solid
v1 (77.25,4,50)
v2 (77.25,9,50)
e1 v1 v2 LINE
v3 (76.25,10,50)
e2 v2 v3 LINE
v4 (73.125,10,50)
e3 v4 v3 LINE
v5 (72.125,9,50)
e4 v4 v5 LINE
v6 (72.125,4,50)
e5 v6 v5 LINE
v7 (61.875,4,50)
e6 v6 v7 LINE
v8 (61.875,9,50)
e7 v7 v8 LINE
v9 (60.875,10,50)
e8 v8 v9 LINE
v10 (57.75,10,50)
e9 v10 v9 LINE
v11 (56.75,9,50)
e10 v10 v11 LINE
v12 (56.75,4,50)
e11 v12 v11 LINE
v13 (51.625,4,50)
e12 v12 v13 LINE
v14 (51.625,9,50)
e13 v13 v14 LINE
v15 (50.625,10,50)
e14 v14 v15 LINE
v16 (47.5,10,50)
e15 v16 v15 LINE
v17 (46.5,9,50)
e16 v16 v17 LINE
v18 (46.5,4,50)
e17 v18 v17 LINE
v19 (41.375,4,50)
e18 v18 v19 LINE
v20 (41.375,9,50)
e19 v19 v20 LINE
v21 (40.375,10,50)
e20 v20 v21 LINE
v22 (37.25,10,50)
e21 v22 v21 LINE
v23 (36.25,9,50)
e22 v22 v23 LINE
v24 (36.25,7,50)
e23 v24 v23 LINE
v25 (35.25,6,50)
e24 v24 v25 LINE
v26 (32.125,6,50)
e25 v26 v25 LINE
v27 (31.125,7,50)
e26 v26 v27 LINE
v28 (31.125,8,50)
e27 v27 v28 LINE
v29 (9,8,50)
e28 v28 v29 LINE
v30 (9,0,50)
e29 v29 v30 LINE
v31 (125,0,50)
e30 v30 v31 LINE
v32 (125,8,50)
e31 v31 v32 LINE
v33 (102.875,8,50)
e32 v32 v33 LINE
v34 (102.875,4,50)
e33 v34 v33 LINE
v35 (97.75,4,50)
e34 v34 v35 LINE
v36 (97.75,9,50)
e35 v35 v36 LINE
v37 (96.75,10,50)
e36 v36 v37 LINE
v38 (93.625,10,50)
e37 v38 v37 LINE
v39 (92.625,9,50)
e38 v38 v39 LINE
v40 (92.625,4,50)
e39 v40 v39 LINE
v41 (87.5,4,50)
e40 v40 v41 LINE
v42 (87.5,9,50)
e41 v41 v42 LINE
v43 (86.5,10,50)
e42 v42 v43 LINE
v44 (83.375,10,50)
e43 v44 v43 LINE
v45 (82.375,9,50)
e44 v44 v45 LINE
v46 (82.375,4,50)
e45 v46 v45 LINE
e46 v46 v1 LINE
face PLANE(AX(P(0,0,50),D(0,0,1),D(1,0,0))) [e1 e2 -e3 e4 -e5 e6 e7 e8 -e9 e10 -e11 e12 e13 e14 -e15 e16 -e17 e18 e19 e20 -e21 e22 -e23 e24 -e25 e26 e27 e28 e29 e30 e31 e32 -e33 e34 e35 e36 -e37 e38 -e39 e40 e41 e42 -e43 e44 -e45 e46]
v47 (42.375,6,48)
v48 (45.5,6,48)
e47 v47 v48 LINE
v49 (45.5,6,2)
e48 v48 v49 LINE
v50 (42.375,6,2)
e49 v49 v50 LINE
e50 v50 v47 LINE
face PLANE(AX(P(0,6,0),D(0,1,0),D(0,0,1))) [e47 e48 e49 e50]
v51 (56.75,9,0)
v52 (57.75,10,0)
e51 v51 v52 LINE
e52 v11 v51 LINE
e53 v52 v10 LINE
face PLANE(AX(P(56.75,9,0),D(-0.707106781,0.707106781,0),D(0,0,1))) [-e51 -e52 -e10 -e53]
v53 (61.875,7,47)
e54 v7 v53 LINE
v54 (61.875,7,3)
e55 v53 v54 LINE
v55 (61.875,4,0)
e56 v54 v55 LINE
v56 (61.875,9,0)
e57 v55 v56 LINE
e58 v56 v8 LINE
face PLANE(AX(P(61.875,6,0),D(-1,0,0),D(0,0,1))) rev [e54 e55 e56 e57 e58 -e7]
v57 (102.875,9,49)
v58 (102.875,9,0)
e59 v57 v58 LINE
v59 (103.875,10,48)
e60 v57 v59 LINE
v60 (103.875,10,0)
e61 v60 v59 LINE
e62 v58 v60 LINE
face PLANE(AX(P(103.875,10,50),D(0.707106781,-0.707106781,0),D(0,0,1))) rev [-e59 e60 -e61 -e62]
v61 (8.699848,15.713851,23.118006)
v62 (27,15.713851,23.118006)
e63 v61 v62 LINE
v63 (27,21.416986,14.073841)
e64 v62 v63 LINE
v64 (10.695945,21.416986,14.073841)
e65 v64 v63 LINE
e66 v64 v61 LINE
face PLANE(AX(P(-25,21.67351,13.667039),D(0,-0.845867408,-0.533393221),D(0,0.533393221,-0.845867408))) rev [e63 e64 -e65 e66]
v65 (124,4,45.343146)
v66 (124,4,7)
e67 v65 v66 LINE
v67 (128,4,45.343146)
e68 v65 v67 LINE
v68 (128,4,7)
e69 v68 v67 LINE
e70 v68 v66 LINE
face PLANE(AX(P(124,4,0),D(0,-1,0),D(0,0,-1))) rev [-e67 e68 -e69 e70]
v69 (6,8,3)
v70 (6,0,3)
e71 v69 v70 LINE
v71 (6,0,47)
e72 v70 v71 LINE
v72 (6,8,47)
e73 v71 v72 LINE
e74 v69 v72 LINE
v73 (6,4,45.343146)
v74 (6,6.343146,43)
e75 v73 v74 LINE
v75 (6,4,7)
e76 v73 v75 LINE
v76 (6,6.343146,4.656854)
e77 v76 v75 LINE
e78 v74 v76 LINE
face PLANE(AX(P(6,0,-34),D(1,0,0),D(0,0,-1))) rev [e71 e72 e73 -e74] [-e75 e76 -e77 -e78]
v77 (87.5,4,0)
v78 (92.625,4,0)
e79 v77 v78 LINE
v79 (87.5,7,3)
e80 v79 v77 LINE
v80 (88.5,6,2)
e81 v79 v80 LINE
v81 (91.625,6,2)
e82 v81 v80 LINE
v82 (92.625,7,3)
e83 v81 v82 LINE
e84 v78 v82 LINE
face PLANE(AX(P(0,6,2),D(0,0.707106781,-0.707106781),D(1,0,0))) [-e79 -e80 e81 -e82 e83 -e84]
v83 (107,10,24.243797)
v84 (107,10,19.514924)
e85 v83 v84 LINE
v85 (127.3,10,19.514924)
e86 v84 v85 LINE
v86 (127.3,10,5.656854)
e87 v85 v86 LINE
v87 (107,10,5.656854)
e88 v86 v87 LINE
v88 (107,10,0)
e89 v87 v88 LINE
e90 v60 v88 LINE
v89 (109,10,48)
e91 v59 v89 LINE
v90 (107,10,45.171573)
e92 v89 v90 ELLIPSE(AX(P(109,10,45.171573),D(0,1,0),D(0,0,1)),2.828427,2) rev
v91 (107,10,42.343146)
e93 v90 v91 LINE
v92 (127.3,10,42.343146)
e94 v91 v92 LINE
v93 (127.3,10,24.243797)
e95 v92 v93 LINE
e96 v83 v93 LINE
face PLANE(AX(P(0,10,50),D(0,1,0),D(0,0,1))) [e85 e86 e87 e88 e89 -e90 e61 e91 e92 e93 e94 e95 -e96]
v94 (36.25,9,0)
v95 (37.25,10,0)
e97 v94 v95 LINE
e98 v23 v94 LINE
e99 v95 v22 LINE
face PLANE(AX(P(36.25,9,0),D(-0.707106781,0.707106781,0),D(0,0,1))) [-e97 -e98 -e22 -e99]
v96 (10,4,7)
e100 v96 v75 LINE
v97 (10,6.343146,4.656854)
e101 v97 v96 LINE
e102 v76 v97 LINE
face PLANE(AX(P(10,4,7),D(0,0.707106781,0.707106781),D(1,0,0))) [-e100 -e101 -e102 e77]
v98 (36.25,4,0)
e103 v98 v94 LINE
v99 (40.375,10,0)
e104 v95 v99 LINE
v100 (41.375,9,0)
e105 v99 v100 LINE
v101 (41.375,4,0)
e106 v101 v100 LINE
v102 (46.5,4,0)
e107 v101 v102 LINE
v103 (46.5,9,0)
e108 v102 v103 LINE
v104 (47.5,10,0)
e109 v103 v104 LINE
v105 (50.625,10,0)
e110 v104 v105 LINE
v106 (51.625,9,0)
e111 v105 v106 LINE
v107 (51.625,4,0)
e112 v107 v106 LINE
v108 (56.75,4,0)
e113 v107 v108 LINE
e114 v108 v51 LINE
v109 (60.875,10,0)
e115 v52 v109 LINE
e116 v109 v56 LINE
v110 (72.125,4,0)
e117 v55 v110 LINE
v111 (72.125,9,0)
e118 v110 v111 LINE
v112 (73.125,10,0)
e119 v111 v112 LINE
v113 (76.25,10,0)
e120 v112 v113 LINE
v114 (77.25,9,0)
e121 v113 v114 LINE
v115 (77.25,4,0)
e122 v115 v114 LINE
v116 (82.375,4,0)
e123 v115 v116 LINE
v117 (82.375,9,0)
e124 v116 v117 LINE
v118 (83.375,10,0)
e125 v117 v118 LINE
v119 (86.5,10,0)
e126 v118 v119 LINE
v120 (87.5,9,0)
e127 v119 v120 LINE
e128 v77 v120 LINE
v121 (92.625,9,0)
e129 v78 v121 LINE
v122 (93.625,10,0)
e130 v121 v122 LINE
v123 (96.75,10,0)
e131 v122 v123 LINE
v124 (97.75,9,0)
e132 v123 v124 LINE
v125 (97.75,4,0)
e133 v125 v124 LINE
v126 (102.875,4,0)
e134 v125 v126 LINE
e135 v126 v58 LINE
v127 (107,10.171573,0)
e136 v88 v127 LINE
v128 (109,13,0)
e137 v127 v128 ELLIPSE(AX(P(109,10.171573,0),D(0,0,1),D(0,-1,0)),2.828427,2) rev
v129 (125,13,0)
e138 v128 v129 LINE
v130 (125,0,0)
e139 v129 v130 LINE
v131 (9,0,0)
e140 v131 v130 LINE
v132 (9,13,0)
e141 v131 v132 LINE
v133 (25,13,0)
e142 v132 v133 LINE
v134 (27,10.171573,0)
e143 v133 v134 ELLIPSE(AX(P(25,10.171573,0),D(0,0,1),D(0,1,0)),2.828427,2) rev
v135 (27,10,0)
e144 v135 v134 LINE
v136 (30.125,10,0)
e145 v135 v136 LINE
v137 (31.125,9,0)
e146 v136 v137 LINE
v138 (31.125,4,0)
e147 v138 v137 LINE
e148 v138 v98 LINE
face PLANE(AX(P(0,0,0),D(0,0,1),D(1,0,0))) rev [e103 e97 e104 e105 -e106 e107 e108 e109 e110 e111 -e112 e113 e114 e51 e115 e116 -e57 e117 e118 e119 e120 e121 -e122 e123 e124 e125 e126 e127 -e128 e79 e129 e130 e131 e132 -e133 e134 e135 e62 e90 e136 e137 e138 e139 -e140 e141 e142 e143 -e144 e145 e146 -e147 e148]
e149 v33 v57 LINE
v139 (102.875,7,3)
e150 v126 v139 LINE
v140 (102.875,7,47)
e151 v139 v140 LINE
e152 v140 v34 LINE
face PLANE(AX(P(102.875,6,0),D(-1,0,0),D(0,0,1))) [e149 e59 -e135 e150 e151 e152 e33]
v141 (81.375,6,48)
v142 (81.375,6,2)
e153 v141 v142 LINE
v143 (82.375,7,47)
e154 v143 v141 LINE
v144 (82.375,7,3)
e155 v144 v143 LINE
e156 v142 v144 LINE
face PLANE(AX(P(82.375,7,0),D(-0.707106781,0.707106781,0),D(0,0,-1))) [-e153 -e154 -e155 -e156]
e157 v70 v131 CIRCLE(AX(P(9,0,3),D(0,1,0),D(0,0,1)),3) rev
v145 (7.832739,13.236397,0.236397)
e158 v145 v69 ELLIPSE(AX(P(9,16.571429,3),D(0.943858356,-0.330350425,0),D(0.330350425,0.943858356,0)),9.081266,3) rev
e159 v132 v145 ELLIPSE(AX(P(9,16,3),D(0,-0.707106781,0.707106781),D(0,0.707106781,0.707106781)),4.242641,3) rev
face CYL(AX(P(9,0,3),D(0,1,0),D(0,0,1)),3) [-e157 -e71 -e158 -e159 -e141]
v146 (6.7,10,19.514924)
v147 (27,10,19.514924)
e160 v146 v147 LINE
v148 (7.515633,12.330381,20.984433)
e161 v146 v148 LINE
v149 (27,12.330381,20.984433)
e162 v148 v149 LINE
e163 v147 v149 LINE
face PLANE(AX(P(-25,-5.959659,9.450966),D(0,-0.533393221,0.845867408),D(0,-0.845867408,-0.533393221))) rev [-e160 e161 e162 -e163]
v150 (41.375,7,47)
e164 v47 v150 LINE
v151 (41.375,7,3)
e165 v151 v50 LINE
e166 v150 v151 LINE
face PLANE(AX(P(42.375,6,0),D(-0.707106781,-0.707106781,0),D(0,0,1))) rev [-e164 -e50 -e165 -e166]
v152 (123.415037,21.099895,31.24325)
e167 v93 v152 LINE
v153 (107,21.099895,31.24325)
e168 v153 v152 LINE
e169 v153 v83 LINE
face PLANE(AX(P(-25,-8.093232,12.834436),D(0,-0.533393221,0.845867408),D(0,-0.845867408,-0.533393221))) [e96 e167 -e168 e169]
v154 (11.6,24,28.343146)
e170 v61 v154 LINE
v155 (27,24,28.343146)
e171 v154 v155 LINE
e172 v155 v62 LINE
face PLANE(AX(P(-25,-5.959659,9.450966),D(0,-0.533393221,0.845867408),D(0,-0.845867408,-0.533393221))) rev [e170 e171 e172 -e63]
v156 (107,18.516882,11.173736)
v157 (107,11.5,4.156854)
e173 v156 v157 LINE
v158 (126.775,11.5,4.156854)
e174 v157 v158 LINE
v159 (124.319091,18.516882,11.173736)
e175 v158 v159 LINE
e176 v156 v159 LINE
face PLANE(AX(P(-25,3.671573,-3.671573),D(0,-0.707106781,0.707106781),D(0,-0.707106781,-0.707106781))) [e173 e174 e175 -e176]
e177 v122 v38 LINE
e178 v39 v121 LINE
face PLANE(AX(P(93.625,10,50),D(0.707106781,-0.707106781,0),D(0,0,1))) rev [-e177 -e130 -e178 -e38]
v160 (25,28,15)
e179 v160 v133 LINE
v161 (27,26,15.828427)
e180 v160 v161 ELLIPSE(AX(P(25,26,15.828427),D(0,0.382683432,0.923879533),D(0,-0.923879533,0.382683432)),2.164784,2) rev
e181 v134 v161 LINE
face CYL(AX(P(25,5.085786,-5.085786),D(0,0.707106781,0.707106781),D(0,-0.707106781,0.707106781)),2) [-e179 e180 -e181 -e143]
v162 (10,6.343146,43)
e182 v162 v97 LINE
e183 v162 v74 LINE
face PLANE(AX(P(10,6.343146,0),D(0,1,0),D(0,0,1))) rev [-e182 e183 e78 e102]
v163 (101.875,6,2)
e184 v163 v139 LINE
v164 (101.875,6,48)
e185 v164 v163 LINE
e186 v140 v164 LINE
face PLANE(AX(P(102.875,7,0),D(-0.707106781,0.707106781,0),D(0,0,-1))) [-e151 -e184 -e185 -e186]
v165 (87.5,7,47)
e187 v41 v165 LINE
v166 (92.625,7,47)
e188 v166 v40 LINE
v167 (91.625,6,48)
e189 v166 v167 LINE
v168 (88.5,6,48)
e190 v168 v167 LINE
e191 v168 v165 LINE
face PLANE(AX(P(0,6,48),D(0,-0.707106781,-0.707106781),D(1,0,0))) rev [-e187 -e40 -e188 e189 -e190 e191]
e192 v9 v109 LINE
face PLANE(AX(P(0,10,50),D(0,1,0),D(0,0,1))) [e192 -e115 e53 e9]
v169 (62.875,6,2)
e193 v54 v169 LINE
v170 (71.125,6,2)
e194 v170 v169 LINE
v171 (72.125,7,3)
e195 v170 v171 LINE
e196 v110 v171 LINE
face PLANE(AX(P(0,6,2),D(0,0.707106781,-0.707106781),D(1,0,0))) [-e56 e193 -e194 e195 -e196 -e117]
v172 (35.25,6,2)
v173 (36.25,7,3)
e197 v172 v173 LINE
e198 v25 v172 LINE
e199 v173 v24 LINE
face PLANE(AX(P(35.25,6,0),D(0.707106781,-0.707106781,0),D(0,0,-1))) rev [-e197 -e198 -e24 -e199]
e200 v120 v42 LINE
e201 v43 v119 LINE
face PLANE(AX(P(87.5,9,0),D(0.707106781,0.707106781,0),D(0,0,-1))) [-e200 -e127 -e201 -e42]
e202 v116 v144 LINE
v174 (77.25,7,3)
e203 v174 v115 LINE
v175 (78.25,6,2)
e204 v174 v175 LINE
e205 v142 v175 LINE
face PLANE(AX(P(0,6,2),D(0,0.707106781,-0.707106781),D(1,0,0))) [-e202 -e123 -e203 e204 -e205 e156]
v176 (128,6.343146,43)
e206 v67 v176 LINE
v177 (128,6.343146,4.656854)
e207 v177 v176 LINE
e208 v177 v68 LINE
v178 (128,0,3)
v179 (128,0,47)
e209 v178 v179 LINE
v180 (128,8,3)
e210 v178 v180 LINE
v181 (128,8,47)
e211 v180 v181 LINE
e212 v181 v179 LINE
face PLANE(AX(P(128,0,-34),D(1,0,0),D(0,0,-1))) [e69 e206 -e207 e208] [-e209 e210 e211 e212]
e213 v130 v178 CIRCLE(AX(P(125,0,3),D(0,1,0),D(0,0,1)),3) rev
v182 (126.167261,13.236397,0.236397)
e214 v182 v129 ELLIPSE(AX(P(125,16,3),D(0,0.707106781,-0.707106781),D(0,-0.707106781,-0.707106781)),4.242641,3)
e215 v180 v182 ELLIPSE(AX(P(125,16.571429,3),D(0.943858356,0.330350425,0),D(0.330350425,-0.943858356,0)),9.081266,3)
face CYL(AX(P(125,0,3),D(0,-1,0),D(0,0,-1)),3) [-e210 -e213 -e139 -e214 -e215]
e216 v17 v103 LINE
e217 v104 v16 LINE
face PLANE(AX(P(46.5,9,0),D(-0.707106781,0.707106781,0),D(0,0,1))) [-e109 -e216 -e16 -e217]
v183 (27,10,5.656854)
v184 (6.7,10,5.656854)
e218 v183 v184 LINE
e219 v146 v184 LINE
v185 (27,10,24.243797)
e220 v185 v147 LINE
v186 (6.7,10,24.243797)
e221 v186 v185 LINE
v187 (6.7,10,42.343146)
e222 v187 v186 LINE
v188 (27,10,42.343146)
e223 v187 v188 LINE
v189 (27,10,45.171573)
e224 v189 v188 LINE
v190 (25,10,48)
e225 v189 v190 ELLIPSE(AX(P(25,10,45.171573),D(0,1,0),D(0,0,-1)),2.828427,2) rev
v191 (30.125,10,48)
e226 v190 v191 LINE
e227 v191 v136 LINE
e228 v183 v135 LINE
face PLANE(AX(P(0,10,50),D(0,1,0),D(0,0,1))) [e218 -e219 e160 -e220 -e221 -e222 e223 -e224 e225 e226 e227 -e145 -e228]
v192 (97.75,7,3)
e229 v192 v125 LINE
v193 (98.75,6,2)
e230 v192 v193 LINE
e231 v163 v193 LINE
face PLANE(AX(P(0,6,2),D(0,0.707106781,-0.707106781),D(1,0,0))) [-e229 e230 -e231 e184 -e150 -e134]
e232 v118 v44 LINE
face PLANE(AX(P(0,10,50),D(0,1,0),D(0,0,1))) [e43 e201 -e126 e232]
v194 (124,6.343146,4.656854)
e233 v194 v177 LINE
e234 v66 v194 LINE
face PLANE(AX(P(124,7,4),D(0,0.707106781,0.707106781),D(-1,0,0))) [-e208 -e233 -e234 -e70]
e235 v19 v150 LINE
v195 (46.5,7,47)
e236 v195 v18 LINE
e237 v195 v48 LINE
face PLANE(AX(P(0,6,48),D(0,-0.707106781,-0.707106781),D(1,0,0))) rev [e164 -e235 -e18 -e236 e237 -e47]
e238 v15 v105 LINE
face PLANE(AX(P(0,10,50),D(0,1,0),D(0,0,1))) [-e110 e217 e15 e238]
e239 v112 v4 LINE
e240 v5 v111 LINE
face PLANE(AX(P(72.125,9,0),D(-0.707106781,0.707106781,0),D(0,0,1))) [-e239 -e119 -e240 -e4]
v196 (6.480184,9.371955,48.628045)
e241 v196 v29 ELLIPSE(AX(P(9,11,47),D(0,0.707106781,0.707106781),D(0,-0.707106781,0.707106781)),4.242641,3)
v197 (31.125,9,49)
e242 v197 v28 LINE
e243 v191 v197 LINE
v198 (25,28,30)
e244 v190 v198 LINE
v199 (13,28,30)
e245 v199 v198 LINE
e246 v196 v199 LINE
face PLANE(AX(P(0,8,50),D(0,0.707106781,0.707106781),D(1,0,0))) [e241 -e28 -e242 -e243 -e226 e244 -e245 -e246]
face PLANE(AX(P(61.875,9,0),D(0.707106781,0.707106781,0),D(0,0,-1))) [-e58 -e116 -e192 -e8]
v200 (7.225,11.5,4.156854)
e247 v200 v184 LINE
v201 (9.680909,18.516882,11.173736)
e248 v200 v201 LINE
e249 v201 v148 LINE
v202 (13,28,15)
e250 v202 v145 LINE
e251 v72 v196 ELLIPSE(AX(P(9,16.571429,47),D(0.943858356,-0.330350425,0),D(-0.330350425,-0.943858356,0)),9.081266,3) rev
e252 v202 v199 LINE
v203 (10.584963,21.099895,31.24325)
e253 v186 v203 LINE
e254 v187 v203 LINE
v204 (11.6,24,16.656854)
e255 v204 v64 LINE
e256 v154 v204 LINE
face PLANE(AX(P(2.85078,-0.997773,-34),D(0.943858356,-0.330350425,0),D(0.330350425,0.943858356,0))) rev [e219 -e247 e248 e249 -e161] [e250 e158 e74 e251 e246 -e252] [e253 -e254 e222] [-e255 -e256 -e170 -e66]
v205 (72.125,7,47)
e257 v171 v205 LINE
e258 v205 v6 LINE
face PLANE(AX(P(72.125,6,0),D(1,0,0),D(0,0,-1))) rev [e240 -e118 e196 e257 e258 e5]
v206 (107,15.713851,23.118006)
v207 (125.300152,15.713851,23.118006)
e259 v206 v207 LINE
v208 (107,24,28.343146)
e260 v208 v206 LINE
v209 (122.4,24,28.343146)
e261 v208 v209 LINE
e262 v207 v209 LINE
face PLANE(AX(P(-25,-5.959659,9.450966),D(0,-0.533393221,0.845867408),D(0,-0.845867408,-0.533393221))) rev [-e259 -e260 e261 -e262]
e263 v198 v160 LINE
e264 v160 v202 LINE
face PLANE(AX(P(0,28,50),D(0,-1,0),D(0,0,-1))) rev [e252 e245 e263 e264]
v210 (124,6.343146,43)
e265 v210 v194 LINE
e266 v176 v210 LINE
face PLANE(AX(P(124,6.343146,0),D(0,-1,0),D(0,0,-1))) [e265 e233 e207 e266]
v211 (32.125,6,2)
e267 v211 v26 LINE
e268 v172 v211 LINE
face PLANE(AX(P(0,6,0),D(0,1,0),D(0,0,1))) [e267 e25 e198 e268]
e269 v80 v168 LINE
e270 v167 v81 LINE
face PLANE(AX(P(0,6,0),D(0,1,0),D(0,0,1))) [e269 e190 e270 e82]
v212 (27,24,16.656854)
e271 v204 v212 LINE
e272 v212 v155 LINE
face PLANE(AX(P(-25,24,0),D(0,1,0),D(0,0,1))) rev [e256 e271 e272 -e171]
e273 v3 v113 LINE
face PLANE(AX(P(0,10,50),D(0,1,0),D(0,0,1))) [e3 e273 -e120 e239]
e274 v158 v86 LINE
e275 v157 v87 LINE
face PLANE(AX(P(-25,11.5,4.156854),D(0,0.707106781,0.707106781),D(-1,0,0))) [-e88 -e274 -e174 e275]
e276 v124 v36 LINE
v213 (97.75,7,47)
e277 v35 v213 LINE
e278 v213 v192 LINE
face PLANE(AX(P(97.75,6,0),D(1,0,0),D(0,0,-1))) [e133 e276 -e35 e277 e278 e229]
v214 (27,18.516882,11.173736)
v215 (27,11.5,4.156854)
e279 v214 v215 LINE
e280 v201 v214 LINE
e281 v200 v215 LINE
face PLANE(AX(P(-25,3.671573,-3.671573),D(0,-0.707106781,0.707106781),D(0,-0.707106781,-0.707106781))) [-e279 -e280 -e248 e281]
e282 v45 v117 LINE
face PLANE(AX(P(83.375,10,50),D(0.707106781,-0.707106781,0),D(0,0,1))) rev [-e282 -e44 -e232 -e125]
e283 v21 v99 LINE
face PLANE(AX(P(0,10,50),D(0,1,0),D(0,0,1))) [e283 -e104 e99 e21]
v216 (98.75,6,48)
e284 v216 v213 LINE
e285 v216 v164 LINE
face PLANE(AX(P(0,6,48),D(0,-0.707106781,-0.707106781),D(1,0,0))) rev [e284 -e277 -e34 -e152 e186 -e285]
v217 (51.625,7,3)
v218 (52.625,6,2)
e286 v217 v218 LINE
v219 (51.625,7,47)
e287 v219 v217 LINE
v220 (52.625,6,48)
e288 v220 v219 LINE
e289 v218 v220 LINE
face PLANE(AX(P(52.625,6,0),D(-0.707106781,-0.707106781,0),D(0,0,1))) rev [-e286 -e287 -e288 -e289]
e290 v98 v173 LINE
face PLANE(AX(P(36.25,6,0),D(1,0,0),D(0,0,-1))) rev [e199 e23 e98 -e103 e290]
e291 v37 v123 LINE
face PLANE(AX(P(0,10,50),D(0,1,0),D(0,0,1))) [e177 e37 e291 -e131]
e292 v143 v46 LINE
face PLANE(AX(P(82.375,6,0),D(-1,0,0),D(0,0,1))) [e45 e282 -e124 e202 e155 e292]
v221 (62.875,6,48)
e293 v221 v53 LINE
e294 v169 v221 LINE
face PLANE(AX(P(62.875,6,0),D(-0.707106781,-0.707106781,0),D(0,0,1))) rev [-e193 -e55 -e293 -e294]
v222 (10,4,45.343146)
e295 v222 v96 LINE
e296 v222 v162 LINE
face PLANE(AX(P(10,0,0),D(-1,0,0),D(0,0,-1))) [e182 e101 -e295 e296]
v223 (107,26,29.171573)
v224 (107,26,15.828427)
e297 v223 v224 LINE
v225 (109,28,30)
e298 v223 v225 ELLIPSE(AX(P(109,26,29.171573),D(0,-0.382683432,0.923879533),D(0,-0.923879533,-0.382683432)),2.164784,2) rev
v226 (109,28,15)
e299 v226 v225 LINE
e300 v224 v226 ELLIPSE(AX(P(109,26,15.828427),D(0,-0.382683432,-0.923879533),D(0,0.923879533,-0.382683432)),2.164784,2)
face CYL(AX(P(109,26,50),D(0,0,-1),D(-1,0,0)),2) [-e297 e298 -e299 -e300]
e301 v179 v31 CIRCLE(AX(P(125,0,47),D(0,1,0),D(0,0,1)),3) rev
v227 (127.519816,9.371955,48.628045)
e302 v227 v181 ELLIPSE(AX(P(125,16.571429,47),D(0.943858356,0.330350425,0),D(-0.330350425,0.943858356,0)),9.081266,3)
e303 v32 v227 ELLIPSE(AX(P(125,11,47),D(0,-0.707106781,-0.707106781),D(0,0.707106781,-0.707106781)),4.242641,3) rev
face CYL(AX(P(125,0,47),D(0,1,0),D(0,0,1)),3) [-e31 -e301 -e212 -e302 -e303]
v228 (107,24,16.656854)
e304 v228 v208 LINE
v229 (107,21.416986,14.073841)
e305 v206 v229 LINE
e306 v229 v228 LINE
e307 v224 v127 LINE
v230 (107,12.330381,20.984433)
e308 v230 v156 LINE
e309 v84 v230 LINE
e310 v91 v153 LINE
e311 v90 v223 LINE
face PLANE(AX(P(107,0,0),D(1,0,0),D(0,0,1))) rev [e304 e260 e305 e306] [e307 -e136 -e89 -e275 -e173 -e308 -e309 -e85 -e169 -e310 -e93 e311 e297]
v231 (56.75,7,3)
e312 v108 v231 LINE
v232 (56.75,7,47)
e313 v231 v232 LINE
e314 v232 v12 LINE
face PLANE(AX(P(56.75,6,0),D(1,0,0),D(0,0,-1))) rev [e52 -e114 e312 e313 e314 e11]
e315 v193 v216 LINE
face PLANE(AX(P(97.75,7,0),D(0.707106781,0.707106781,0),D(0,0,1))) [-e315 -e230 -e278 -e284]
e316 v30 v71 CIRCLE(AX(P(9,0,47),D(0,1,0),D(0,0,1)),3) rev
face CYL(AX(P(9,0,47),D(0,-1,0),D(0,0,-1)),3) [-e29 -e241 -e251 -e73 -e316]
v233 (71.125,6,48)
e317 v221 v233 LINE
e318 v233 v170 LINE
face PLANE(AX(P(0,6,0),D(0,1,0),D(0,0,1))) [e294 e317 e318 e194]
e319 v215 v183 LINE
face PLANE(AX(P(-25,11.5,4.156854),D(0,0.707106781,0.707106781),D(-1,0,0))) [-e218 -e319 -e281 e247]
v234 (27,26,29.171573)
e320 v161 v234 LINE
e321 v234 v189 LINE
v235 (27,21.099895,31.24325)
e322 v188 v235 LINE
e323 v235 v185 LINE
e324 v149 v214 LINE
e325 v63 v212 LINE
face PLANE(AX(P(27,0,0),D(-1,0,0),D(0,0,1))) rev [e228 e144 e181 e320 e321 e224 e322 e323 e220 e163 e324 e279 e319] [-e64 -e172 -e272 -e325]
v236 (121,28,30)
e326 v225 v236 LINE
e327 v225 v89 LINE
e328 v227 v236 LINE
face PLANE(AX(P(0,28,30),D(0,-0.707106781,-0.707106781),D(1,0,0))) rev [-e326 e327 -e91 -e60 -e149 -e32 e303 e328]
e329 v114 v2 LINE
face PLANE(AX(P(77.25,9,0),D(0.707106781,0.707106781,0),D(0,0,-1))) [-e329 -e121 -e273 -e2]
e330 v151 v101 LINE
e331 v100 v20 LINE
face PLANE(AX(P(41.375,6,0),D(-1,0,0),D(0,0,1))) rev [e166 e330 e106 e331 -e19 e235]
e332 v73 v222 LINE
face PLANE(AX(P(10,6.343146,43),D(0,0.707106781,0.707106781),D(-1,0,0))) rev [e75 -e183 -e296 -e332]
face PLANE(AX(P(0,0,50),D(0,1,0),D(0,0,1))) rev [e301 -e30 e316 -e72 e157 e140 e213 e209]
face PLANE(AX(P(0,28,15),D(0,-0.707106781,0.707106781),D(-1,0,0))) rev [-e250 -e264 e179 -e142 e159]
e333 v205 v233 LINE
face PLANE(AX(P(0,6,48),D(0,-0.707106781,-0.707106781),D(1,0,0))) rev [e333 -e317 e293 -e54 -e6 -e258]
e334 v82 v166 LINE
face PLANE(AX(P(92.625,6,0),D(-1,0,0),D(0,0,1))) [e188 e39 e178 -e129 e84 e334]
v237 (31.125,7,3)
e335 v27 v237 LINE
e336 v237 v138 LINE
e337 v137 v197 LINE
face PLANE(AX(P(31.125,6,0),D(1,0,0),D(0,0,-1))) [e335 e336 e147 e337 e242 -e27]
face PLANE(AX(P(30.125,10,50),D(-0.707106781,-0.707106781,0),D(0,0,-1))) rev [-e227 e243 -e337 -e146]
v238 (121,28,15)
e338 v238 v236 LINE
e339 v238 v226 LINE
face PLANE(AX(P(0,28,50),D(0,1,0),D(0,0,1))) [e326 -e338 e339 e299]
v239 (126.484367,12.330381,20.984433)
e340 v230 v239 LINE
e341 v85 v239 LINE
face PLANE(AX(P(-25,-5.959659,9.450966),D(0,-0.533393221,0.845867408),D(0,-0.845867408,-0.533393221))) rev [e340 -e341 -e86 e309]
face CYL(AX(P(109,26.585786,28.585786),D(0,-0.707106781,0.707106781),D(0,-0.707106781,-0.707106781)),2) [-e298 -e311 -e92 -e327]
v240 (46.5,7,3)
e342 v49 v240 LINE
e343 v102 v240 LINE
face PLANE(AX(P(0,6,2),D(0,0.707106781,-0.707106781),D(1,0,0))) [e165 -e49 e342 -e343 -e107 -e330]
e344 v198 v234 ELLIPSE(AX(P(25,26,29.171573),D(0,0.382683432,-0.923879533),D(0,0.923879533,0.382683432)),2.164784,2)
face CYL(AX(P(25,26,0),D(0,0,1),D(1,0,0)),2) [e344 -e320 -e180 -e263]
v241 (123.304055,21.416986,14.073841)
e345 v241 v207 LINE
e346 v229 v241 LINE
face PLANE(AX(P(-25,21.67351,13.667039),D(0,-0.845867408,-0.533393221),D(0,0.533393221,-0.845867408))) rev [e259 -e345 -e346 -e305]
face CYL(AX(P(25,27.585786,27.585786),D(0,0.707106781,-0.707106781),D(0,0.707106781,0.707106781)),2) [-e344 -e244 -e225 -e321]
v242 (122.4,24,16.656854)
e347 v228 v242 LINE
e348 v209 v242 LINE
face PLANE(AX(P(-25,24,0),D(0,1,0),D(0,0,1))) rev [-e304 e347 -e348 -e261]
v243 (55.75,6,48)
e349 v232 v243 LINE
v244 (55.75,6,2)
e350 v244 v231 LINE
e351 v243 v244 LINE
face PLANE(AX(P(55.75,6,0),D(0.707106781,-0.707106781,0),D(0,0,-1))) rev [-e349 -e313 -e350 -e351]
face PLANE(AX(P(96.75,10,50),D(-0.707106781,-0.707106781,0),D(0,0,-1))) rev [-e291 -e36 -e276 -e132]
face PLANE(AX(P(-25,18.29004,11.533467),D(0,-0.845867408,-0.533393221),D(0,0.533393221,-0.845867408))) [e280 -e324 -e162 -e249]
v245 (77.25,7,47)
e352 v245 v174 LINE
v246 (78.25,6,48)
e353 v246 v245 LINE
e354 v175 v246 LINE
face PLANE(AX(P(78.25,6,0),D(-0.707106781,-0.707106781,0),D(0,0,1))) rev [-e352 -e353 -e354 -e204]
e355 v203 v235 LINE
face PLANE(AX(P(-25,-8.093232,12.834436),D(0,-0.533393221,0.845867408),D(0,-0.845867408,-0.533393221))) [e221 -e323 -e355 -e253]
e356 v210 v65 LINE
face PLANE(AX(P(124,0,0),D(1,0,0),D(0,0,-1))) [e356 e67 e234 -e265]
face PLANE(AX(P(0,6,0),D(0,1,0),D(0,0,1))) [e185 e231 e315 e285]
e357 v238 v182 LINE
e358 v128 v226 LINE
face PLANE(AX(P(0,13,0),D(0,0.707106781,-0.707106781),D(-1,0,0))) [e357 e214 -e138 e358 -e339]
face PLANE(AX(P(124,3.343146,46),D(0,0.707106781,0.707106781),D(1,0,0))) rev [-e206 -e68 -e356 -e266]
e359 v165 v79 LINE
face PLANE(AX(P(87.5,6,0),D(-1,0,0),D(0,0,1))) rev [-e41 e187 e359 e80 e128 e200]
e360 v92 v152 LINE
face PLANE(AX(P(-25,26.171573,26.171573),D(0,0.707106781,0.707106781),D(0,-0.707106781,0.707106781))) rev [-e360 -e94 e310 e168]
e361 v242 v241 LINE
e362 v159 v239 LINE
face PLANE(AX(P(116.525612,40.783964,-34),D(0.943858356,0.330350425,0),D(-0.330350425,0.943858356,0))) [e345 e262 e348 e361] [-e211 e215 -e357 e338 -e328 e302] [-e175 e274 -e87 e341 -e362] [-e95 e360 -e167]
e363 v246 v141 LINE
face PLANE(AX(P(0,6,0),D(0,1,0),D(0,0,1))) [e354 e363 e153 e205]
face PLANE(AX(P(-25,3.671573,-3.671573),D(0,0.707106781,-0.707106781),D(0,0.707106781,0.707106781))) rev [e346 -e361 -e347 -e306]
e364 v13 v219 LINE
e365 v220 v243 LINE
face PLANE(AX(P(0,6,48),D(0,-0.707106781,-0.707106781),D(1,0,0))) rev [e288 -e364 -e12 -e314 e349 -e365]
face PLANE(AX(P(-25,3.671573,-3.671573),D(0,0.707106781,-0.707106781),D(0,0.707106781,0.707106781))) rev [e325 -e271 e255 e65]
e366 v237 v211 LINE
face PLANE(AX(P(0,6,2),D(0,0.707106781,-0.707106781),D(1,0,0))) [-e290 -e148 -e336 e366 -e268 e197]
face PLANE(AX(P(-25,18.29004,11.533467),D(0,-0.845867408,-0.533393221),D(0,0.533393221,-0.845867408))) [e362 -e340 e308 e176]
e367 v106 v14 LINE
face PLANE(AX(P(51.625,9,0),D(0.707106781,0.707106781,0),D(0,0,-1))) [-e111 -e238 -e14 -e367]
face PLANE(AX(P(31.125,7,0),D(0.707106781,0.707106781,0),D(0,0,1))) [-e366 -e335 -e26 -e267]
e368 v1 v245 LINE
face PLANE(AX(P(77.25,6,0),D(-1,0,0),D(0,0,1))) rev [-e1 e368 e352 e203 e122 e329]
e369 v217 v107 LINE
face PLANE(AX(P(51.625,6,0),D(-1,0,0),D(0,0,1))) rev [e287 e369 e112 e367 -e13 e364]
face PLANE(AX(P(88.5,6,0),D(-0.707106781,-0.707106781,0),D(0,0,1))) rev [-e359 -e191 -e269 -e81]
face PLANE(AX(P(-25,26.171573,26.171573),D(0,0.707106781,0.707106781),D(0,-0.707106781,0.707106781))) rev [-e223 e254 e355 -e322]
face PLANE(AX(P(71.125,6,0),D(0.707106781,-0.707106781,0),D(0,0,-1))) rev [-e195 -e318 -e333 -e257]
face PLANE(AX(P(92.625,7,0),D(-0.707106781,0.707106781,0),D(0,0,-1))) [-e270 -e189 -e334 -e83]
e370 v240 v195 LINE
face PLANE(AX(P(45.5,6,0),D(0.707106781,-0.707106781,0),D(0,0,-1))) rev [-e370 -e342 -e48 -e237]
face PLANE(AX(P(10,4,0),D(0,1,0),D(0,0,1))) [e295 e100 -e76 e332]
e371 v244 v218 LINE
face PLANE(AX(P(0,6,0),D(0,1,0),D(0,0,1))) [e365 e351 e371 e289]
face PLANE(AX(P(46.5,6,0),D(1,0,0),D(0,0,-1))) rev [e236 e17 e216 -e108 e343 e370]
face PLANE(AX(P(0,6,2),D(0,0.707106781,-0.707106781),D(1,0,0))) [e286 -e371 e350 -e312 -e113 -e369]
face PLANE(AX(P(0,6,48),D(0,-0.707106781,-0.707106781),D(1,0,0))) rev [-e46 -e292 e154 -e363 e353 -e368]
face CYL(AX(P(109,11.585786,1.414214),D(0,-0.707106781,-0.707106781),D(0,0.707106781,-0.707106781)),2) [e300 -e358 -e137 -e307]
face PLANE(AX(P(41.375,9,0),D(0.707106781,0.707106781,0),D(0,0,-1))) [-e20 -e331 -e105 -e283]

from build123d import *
from OCP.BRepFilletAPI import BRepFilletAPI_MakeChamfer

# Parameters (mm, degrees)
SKETCH1_W                 = 26
SKETCH1_H                 = 18
SKETCH1_W_2               = 134
SKETCH1_H_2               = 10
BOSS_EXTRUDE1_DEPTH       = 50
SKETCH4_W                 = 5.125
SKETCH4_H                 = 50
CUT_EXTRUDE3_DEPTH        = 4
CHAMFER1_SIZE             = 2
CHAMFER2_SIZE             = 1
CHAMFER3_SIZE             = 1
CHAMFER4_SIZE             = 1
CHAMFER5_SIZE             = 15
CHAMFER6_SIZE             = 20
CUT_EXTRUDE4_DEPTH        = 159
CHAMFER9_SIZE             = 3
CHAMFER9_SIZE2            = 2.121320344
SKETCH6_W                 = 42
SKETCH6_H                 = 2.343145751
CUT_EXTRUDE5_DEPTH        = 10
CHAMFER10_SIZE            = 3
CHAMFER10_OF_MIRROR1_SIZE = 3
CUT_EXTRUDE6_DEPTH        = 94
FILLET2_R                 = 2
BOSS_EXTRUDE2_DEPTH       = 1
SKETCH9_W                 = 4
SKETCH9_H                 = 8
CUT_EXTRUDE7_DEPTH        = 84
FILLET3_R                 = 3
FILLET4_R                 = 2


with BuildPart() as part:
    # Sketch1 → Boss-Extrude1 (new body)
    with BuildSketch(Plane.XY):
        with Locations((13, 19)):
            Rectangle(SKETCH1_W, SKETCH1_H)
        with Locations((67, 5)):
            Rectangle(SKETCH1_W_2, SKETCH1_H_2)
        with Locations((121, 19)):
            Rectangle(SKETCH1_W, SKETCH1_H)
    extrude(amount=BOSS_EXTRUDE1_DEPTH)

    # Sketch4 → Cut-Extrude3 (cut)
    with BuildSketch(Plane(origin=(0, 10, 0), x_dir=(1, 0, 0), z_dir=(0, 1, 0))):
        with Locations((33.6875, -25)):
            Rectangle(SKETCH4_W, SKETCH4_H)
        with Locations((100.3125, -25)):
            Rectangle(SKETCH4_W, SKETCH4_H)
        with Locations((43.9375, -25)):
            Rectangle(SKETCH4_W, SKETCH4_H)
        with Locations((90.0625, -25)):
            Rectangle(SKETCH4_W, SKETCH4_H)
        with Locations((54.1875, -25)):
            Rectangle(SKETCH4_W, SKETCH4_H)
        with Locations((79.8125, -25)):
            Rectangle(SKETCH4_W, SKETCH4_H)
        with Locations((64.4375, -25)):
            Rectangle(SKETCH4_W, SKETCH4_H)
        with Locations((69.5625, -25)):
            Rectangle(SKETCH4_W, SKETCH4_H)
    extrude(amount=-CUT_EXTRUDE3_DEPTH, mode=Mode.SUBTRACT)

    # Chamfer1
    chamfer1_edges = [part.edges().sort_by_distance(p)[0] for p in [
        (100.3125, 6, 50),
        (100.3125, 6, 0),
        (43.9375, 6, 0),
        (43.9375, 6, 50),
        (90.0625, 6, 50),
        (90.0625, 6, 0),
        (54.1875, 6, 0),
        (54.1875, 6, 50),
        (33.6875, 6, 0),
        (67, 6, 0),
        (67, 6, 50),
        (79.8125, 6, 50),
        (79.8125, 6, 0),
    ]]
    chamfer(chamfer1_edges, length=CHAMFER1_SIZE)

    # Chamfer2
    chamfer2_edges = [part.edges().sort_by_distance(p)[0] for p in [
        (102.875, 10, 25),
        (97.75, 10, 25),
        (41.375, 10, 25),
        (46.5, 10, 25),
        (92.625, 10, 25),
        (87.5, 10, 25),
        (51.625, 10, 25),
        (56.75, 10, 25),
        (31.125, 10, 25),
        (36.25, 10, 25),
        (61.875, 10, 25),
        (72.125, 10, 25),
        (82.375, 10, 25),
        (77.25, 10, 25),
    ]]
    chamfer(chamfer2_edges, length=CHAMFER2_SIZE)

    # Chamfer3
    chamfer3_edges = [part.edges().sort_by_distance(p)[0] for p in [
        (102.875, 6, 25),
        (97.75, 6, 25),
    ]]
    chamfer(chamfer3_edges, length=CHAMFER3_SIZE)

    # Chamfer4
    chamfer4_edges = [part.edges().sort_by_distance(p)[0] for p in [
        (41.375, 6, 25),
        (46.5, 6, 25),
        (51.625, 6, 25),
        (56.75, 6, 25),
        (61.875, 6, 25),
        (72.125, 6, 25),
        (82.375, 6, 25),
        (77.25, 6, 25),
        (92.625, 6, 25),
        (87.5, 6, 25),
        (36.25, 6, 26),
        (31.125, 6, 26),
    ]]
    chamfer(chamfer4_edges, length=CHAMFER4_SIZE)

    # Chamfer5
    chamfer5_edges = [part.edges().sort_by_distance(p)[0] for p in [
        (121, 28, 0),
        (13, 28, 0),
    ]]
    chamfer(chamfer5_edges, length=CHAMFER5_SIZE)

    # Chamfer6
    chamfer6_edges = [part.edges().sort_by_distance(p)[0] for p in [
        (13, 28, 50),
        (121, 28, 50),
    ]]
    chamfer(chamfer6_edges, length=CHAMFER6_SIZE)

    # Sketch5 → Cut-Extrude4 (cut)
    with BuildSketch(Plane(origin=(134, 0, 0), x_dir=(0, 0, -1), z_dir=(1, 0, 0))):
        Polygon((-23.118005616, 15.713850942), (-14.073840564, 21.416986315), (-16.656854249, 24), (-28.343145751, 24), align=None)
        Polygon((-24.243797472, 10), (-31.243250282, 21.099895469), (-38.343145751, 14), (-42.343145751, 10), align=None)
        Polygon((-20.98443273, 12.330381312), (-19.514923935, 10), (-2.656854249, 10), (-6.656854249, 14), (-11.173736033, 18.516881784), align=None)
    extrude(amount=-CUT_EXTRUDE4_DEPTH, mode=Mode.SUBTRACT)

    # Chamfer9: one chamfer whose edges measure the first distance from different faces: ONE call of the kernel's chamfer builder (chamfer() names one face for all edges)
    chamfer9_edges_1 = [part.edges().sort_by_distance(p)[0] for p in [
        (13, 10, 2.656854249),
    ]]
    chamfer9_side_1 = [part.faces().sort_by_distance(p)[0] for p in [
        (28.0625, 10, 0.566702358),
    ]]
    chamfer9_edges_2 = [part.edges().sort_by_distance(p)[0] for p in [
        (121, 10, 2.656854249),
    ]]
    chamfer9_side_2 = [part.faces().sort_by_distance(p)[0] for p in [
        (104.441702358, 10, 24),
    ]]
    chamfer9 = BRepFilletAPI_MakeChamfer(part.part.solid().wrapped)
    for e in chamfer9_edges_1:
        chamfer9.Add(CHAMFER9_SIZE, CHAMFER9_SIZE2, e.wrapped, chamfer9_side_1[0].wrapped)  # the first distance lies on this face
    for e in chamfer9_edges_2:
        chamfer9.Add(CHAMFER9_SIZE, CHAMFER9_SIZE2, e.wrapped, chamfer9_side_2[0].wrapped)  # the first distance lies on this face
    add(Compound.cast(chamfer9.Shape()), mode=Mode.REPLACE)

    # Sketch6 → Cut-Extrude5 (cut)
    with BuildSketch(Plane(origin=(134, 0, 0), x_dir=(0, 0, -1), z_dir=(1, 0, 0))):
        with Locations((-25, 5.171572876)):
            Rectangle(SKETCH6_W, SKETCH6_H)
    cut_extrude5 = extrude(amount=-CUT_EXTRUDE5_DEPTH, mode=Mode.SUBTRACT)

    # Chamfer10
    # the kernel refuses this chamfer: 3 mm, written as the material it adds along each edge
    with BuildSketch(Plane(origin=(134, 4, 4), x_dir=(0, -0.02749587661058634, 0.9996219169112968), z_dir=(-1, 0, 0)), Plane(origin=(134, 6.343145751, 46), x_dir=(0, 0.02749587661058648, -0.9996219169112968), z_dir=(-1, 0, 0))) as chamfer10_piece_1:
        Polygon((CHAMFER10_SIZE * 0.999621916911, CHAMFER10_SIZE * 0.0274958766106), (-CHAMFER10_SIZE * 0.0274958766106, CHAMFER10_SIZE * 0.999621916911), (0, 0), align=None)
    extrude(amount=17.715048964)

    # Mirror1: Cut-Extrude5 across plane
    add(cut_extrude5.mirror(Plane.ZY.offset(-67)), mode=Mode.SUBTRACT)

    # Chamfer10 of Mirror1
    # the kernel refuses this chamfer: 3 mm, written as the material it adds along each edge
    with BuildSketch(Plane(origin=(0, 4, 4), x_dir=(0, -0.02749587661058634, 0.9996219169112968), z_dir=(1, 0, 0)), Plane(origin=(0, 6.343145751, 46), x_dir=(0, 0.02749587661058648, -0.9996219169112968), z_dir=(1, 0, 0))) as chamfer10_of_mirror1_piece_1:
        Polygon((CHAMFER10_OF_MIRROR1_SIZE * 0.999621916911, -CHAMFER10_OF_MIRROR1_SIZE * 0.0274958766106), (-CHAMFER10_OF_MIRROR1_SIZE * 0.0274958766106, -CHAMFER10_OF_MIRROR1_SIZE * 0.999621916911), (0, 0), align=None)
    extrude(amount=17.715048964)

    # Sketch7 → Cut-Extrude6 (cut)
    with BuildSketch(Plane.XY.offset(50)):
        Polygon((0, 8), (13, 28), (0, 28), align=None)
        Polygon((121, 28), (134, 8), (134, 28), align=None)
    extrude(amount=-CUT_EXTRUDE6_DEPTH, mode=Mode.SUBTRACT)

    # Fillet2
    fillet2_edges = [part.edges().sort_by_distance(p)[0] for p in [
        (0, 4, 0),
        (134, 4, 0),
        (0, 4, 50),
        (134, 4, 50),
    ]]
    fillet(fillet2_edges, radius=FILLET2_R)

    # Sketch8 → Boss-Extrude2 (add)
    with BuildSketch(Plane(origin=(26, 0, 0), x_dir=(0, 0, -1), z_dir=(1, 0, 0))):
        Polygon((-11.173736033, 18.516881784), (-4.156854249, 11.5), (-5.656854249, 10), (0, 10), (0, 13), (-15, 28), (-30, 28), (-48, 10), (-42.343145751, 10), (-31.243250282, 21.099895469), (-24.243797472, 10), (-19.514923935, 10), (-20.98443273, 12.330381312), align=None)
        Polygon((-16.656854249, 24), (-14.073840564, 21.416986315), (-23.118005616, 15.713850942), (-28.343145751, 24), align=None, mode=Mode.SUBTRACT)
    boss_extrude2 = extrude(amount=BOSS_EXTRUDE2_DEPTH)

    # Mirror2: Boss-Extrude2 across plane
    add(boss_extrude2.mirror(Plane(origin=(67, 0, 0), x_dir=(0, 0, 1), z_dir=(1, 0, 0))))

    # Sketch9 → Cut-Extrude7 (cut)
    with BuildSketch(Plane.XY.offset(50)):
        with Locations((4, 4)):
            Rectangle(SKETCH9_W, SKETCH9_H)
        Polygon((0, 8), (0, 0), (2, 0), (2, 8), (6, 8), (6, 17.230769231), align=None)
        Polygon((13, 28), (6, 17.230769231), (6, 8), align=None)
        Polygon((121, 28), (128, 8), (128, 17.230769231), align=None)
        Polygon((132, 8), (132, 0), (134, 0), (134, 8), (128, 17.230769231), (128, 8), align=None)
        with Locations((130, 4)):
            Rectangle(SKETCH9_W, SKETCH9_H)
    extrude(amount=-CUT_EXTRUDE7_DEPTH, mode=Mode.SUBTRACT)

    # Fillet3
    fillet3_edges = [part.edges().sort_by_distance(p)[0] for p in [
        (128, 4, 0),
        (128, 4, 50),
        (6, 4, 50),
        (6, 4, 0),
    ]]
    fillet(fillet3_edges, radius=FILLET3_R)

    # Fillet4
    fillet4_edges = [part.edges().sort_by_distance(p)[0] for p in [
        (27, 20.5, 7.5),
        (27, 28, 22.5),
        (27, 19, 39),
        (107, 19, 39),
        (107, 28, 22.5),
        (107, 20.5, 7.5),
    ]]
    fillet(fillet4_edges, radius=FILLET4_R)


solid = part.part
